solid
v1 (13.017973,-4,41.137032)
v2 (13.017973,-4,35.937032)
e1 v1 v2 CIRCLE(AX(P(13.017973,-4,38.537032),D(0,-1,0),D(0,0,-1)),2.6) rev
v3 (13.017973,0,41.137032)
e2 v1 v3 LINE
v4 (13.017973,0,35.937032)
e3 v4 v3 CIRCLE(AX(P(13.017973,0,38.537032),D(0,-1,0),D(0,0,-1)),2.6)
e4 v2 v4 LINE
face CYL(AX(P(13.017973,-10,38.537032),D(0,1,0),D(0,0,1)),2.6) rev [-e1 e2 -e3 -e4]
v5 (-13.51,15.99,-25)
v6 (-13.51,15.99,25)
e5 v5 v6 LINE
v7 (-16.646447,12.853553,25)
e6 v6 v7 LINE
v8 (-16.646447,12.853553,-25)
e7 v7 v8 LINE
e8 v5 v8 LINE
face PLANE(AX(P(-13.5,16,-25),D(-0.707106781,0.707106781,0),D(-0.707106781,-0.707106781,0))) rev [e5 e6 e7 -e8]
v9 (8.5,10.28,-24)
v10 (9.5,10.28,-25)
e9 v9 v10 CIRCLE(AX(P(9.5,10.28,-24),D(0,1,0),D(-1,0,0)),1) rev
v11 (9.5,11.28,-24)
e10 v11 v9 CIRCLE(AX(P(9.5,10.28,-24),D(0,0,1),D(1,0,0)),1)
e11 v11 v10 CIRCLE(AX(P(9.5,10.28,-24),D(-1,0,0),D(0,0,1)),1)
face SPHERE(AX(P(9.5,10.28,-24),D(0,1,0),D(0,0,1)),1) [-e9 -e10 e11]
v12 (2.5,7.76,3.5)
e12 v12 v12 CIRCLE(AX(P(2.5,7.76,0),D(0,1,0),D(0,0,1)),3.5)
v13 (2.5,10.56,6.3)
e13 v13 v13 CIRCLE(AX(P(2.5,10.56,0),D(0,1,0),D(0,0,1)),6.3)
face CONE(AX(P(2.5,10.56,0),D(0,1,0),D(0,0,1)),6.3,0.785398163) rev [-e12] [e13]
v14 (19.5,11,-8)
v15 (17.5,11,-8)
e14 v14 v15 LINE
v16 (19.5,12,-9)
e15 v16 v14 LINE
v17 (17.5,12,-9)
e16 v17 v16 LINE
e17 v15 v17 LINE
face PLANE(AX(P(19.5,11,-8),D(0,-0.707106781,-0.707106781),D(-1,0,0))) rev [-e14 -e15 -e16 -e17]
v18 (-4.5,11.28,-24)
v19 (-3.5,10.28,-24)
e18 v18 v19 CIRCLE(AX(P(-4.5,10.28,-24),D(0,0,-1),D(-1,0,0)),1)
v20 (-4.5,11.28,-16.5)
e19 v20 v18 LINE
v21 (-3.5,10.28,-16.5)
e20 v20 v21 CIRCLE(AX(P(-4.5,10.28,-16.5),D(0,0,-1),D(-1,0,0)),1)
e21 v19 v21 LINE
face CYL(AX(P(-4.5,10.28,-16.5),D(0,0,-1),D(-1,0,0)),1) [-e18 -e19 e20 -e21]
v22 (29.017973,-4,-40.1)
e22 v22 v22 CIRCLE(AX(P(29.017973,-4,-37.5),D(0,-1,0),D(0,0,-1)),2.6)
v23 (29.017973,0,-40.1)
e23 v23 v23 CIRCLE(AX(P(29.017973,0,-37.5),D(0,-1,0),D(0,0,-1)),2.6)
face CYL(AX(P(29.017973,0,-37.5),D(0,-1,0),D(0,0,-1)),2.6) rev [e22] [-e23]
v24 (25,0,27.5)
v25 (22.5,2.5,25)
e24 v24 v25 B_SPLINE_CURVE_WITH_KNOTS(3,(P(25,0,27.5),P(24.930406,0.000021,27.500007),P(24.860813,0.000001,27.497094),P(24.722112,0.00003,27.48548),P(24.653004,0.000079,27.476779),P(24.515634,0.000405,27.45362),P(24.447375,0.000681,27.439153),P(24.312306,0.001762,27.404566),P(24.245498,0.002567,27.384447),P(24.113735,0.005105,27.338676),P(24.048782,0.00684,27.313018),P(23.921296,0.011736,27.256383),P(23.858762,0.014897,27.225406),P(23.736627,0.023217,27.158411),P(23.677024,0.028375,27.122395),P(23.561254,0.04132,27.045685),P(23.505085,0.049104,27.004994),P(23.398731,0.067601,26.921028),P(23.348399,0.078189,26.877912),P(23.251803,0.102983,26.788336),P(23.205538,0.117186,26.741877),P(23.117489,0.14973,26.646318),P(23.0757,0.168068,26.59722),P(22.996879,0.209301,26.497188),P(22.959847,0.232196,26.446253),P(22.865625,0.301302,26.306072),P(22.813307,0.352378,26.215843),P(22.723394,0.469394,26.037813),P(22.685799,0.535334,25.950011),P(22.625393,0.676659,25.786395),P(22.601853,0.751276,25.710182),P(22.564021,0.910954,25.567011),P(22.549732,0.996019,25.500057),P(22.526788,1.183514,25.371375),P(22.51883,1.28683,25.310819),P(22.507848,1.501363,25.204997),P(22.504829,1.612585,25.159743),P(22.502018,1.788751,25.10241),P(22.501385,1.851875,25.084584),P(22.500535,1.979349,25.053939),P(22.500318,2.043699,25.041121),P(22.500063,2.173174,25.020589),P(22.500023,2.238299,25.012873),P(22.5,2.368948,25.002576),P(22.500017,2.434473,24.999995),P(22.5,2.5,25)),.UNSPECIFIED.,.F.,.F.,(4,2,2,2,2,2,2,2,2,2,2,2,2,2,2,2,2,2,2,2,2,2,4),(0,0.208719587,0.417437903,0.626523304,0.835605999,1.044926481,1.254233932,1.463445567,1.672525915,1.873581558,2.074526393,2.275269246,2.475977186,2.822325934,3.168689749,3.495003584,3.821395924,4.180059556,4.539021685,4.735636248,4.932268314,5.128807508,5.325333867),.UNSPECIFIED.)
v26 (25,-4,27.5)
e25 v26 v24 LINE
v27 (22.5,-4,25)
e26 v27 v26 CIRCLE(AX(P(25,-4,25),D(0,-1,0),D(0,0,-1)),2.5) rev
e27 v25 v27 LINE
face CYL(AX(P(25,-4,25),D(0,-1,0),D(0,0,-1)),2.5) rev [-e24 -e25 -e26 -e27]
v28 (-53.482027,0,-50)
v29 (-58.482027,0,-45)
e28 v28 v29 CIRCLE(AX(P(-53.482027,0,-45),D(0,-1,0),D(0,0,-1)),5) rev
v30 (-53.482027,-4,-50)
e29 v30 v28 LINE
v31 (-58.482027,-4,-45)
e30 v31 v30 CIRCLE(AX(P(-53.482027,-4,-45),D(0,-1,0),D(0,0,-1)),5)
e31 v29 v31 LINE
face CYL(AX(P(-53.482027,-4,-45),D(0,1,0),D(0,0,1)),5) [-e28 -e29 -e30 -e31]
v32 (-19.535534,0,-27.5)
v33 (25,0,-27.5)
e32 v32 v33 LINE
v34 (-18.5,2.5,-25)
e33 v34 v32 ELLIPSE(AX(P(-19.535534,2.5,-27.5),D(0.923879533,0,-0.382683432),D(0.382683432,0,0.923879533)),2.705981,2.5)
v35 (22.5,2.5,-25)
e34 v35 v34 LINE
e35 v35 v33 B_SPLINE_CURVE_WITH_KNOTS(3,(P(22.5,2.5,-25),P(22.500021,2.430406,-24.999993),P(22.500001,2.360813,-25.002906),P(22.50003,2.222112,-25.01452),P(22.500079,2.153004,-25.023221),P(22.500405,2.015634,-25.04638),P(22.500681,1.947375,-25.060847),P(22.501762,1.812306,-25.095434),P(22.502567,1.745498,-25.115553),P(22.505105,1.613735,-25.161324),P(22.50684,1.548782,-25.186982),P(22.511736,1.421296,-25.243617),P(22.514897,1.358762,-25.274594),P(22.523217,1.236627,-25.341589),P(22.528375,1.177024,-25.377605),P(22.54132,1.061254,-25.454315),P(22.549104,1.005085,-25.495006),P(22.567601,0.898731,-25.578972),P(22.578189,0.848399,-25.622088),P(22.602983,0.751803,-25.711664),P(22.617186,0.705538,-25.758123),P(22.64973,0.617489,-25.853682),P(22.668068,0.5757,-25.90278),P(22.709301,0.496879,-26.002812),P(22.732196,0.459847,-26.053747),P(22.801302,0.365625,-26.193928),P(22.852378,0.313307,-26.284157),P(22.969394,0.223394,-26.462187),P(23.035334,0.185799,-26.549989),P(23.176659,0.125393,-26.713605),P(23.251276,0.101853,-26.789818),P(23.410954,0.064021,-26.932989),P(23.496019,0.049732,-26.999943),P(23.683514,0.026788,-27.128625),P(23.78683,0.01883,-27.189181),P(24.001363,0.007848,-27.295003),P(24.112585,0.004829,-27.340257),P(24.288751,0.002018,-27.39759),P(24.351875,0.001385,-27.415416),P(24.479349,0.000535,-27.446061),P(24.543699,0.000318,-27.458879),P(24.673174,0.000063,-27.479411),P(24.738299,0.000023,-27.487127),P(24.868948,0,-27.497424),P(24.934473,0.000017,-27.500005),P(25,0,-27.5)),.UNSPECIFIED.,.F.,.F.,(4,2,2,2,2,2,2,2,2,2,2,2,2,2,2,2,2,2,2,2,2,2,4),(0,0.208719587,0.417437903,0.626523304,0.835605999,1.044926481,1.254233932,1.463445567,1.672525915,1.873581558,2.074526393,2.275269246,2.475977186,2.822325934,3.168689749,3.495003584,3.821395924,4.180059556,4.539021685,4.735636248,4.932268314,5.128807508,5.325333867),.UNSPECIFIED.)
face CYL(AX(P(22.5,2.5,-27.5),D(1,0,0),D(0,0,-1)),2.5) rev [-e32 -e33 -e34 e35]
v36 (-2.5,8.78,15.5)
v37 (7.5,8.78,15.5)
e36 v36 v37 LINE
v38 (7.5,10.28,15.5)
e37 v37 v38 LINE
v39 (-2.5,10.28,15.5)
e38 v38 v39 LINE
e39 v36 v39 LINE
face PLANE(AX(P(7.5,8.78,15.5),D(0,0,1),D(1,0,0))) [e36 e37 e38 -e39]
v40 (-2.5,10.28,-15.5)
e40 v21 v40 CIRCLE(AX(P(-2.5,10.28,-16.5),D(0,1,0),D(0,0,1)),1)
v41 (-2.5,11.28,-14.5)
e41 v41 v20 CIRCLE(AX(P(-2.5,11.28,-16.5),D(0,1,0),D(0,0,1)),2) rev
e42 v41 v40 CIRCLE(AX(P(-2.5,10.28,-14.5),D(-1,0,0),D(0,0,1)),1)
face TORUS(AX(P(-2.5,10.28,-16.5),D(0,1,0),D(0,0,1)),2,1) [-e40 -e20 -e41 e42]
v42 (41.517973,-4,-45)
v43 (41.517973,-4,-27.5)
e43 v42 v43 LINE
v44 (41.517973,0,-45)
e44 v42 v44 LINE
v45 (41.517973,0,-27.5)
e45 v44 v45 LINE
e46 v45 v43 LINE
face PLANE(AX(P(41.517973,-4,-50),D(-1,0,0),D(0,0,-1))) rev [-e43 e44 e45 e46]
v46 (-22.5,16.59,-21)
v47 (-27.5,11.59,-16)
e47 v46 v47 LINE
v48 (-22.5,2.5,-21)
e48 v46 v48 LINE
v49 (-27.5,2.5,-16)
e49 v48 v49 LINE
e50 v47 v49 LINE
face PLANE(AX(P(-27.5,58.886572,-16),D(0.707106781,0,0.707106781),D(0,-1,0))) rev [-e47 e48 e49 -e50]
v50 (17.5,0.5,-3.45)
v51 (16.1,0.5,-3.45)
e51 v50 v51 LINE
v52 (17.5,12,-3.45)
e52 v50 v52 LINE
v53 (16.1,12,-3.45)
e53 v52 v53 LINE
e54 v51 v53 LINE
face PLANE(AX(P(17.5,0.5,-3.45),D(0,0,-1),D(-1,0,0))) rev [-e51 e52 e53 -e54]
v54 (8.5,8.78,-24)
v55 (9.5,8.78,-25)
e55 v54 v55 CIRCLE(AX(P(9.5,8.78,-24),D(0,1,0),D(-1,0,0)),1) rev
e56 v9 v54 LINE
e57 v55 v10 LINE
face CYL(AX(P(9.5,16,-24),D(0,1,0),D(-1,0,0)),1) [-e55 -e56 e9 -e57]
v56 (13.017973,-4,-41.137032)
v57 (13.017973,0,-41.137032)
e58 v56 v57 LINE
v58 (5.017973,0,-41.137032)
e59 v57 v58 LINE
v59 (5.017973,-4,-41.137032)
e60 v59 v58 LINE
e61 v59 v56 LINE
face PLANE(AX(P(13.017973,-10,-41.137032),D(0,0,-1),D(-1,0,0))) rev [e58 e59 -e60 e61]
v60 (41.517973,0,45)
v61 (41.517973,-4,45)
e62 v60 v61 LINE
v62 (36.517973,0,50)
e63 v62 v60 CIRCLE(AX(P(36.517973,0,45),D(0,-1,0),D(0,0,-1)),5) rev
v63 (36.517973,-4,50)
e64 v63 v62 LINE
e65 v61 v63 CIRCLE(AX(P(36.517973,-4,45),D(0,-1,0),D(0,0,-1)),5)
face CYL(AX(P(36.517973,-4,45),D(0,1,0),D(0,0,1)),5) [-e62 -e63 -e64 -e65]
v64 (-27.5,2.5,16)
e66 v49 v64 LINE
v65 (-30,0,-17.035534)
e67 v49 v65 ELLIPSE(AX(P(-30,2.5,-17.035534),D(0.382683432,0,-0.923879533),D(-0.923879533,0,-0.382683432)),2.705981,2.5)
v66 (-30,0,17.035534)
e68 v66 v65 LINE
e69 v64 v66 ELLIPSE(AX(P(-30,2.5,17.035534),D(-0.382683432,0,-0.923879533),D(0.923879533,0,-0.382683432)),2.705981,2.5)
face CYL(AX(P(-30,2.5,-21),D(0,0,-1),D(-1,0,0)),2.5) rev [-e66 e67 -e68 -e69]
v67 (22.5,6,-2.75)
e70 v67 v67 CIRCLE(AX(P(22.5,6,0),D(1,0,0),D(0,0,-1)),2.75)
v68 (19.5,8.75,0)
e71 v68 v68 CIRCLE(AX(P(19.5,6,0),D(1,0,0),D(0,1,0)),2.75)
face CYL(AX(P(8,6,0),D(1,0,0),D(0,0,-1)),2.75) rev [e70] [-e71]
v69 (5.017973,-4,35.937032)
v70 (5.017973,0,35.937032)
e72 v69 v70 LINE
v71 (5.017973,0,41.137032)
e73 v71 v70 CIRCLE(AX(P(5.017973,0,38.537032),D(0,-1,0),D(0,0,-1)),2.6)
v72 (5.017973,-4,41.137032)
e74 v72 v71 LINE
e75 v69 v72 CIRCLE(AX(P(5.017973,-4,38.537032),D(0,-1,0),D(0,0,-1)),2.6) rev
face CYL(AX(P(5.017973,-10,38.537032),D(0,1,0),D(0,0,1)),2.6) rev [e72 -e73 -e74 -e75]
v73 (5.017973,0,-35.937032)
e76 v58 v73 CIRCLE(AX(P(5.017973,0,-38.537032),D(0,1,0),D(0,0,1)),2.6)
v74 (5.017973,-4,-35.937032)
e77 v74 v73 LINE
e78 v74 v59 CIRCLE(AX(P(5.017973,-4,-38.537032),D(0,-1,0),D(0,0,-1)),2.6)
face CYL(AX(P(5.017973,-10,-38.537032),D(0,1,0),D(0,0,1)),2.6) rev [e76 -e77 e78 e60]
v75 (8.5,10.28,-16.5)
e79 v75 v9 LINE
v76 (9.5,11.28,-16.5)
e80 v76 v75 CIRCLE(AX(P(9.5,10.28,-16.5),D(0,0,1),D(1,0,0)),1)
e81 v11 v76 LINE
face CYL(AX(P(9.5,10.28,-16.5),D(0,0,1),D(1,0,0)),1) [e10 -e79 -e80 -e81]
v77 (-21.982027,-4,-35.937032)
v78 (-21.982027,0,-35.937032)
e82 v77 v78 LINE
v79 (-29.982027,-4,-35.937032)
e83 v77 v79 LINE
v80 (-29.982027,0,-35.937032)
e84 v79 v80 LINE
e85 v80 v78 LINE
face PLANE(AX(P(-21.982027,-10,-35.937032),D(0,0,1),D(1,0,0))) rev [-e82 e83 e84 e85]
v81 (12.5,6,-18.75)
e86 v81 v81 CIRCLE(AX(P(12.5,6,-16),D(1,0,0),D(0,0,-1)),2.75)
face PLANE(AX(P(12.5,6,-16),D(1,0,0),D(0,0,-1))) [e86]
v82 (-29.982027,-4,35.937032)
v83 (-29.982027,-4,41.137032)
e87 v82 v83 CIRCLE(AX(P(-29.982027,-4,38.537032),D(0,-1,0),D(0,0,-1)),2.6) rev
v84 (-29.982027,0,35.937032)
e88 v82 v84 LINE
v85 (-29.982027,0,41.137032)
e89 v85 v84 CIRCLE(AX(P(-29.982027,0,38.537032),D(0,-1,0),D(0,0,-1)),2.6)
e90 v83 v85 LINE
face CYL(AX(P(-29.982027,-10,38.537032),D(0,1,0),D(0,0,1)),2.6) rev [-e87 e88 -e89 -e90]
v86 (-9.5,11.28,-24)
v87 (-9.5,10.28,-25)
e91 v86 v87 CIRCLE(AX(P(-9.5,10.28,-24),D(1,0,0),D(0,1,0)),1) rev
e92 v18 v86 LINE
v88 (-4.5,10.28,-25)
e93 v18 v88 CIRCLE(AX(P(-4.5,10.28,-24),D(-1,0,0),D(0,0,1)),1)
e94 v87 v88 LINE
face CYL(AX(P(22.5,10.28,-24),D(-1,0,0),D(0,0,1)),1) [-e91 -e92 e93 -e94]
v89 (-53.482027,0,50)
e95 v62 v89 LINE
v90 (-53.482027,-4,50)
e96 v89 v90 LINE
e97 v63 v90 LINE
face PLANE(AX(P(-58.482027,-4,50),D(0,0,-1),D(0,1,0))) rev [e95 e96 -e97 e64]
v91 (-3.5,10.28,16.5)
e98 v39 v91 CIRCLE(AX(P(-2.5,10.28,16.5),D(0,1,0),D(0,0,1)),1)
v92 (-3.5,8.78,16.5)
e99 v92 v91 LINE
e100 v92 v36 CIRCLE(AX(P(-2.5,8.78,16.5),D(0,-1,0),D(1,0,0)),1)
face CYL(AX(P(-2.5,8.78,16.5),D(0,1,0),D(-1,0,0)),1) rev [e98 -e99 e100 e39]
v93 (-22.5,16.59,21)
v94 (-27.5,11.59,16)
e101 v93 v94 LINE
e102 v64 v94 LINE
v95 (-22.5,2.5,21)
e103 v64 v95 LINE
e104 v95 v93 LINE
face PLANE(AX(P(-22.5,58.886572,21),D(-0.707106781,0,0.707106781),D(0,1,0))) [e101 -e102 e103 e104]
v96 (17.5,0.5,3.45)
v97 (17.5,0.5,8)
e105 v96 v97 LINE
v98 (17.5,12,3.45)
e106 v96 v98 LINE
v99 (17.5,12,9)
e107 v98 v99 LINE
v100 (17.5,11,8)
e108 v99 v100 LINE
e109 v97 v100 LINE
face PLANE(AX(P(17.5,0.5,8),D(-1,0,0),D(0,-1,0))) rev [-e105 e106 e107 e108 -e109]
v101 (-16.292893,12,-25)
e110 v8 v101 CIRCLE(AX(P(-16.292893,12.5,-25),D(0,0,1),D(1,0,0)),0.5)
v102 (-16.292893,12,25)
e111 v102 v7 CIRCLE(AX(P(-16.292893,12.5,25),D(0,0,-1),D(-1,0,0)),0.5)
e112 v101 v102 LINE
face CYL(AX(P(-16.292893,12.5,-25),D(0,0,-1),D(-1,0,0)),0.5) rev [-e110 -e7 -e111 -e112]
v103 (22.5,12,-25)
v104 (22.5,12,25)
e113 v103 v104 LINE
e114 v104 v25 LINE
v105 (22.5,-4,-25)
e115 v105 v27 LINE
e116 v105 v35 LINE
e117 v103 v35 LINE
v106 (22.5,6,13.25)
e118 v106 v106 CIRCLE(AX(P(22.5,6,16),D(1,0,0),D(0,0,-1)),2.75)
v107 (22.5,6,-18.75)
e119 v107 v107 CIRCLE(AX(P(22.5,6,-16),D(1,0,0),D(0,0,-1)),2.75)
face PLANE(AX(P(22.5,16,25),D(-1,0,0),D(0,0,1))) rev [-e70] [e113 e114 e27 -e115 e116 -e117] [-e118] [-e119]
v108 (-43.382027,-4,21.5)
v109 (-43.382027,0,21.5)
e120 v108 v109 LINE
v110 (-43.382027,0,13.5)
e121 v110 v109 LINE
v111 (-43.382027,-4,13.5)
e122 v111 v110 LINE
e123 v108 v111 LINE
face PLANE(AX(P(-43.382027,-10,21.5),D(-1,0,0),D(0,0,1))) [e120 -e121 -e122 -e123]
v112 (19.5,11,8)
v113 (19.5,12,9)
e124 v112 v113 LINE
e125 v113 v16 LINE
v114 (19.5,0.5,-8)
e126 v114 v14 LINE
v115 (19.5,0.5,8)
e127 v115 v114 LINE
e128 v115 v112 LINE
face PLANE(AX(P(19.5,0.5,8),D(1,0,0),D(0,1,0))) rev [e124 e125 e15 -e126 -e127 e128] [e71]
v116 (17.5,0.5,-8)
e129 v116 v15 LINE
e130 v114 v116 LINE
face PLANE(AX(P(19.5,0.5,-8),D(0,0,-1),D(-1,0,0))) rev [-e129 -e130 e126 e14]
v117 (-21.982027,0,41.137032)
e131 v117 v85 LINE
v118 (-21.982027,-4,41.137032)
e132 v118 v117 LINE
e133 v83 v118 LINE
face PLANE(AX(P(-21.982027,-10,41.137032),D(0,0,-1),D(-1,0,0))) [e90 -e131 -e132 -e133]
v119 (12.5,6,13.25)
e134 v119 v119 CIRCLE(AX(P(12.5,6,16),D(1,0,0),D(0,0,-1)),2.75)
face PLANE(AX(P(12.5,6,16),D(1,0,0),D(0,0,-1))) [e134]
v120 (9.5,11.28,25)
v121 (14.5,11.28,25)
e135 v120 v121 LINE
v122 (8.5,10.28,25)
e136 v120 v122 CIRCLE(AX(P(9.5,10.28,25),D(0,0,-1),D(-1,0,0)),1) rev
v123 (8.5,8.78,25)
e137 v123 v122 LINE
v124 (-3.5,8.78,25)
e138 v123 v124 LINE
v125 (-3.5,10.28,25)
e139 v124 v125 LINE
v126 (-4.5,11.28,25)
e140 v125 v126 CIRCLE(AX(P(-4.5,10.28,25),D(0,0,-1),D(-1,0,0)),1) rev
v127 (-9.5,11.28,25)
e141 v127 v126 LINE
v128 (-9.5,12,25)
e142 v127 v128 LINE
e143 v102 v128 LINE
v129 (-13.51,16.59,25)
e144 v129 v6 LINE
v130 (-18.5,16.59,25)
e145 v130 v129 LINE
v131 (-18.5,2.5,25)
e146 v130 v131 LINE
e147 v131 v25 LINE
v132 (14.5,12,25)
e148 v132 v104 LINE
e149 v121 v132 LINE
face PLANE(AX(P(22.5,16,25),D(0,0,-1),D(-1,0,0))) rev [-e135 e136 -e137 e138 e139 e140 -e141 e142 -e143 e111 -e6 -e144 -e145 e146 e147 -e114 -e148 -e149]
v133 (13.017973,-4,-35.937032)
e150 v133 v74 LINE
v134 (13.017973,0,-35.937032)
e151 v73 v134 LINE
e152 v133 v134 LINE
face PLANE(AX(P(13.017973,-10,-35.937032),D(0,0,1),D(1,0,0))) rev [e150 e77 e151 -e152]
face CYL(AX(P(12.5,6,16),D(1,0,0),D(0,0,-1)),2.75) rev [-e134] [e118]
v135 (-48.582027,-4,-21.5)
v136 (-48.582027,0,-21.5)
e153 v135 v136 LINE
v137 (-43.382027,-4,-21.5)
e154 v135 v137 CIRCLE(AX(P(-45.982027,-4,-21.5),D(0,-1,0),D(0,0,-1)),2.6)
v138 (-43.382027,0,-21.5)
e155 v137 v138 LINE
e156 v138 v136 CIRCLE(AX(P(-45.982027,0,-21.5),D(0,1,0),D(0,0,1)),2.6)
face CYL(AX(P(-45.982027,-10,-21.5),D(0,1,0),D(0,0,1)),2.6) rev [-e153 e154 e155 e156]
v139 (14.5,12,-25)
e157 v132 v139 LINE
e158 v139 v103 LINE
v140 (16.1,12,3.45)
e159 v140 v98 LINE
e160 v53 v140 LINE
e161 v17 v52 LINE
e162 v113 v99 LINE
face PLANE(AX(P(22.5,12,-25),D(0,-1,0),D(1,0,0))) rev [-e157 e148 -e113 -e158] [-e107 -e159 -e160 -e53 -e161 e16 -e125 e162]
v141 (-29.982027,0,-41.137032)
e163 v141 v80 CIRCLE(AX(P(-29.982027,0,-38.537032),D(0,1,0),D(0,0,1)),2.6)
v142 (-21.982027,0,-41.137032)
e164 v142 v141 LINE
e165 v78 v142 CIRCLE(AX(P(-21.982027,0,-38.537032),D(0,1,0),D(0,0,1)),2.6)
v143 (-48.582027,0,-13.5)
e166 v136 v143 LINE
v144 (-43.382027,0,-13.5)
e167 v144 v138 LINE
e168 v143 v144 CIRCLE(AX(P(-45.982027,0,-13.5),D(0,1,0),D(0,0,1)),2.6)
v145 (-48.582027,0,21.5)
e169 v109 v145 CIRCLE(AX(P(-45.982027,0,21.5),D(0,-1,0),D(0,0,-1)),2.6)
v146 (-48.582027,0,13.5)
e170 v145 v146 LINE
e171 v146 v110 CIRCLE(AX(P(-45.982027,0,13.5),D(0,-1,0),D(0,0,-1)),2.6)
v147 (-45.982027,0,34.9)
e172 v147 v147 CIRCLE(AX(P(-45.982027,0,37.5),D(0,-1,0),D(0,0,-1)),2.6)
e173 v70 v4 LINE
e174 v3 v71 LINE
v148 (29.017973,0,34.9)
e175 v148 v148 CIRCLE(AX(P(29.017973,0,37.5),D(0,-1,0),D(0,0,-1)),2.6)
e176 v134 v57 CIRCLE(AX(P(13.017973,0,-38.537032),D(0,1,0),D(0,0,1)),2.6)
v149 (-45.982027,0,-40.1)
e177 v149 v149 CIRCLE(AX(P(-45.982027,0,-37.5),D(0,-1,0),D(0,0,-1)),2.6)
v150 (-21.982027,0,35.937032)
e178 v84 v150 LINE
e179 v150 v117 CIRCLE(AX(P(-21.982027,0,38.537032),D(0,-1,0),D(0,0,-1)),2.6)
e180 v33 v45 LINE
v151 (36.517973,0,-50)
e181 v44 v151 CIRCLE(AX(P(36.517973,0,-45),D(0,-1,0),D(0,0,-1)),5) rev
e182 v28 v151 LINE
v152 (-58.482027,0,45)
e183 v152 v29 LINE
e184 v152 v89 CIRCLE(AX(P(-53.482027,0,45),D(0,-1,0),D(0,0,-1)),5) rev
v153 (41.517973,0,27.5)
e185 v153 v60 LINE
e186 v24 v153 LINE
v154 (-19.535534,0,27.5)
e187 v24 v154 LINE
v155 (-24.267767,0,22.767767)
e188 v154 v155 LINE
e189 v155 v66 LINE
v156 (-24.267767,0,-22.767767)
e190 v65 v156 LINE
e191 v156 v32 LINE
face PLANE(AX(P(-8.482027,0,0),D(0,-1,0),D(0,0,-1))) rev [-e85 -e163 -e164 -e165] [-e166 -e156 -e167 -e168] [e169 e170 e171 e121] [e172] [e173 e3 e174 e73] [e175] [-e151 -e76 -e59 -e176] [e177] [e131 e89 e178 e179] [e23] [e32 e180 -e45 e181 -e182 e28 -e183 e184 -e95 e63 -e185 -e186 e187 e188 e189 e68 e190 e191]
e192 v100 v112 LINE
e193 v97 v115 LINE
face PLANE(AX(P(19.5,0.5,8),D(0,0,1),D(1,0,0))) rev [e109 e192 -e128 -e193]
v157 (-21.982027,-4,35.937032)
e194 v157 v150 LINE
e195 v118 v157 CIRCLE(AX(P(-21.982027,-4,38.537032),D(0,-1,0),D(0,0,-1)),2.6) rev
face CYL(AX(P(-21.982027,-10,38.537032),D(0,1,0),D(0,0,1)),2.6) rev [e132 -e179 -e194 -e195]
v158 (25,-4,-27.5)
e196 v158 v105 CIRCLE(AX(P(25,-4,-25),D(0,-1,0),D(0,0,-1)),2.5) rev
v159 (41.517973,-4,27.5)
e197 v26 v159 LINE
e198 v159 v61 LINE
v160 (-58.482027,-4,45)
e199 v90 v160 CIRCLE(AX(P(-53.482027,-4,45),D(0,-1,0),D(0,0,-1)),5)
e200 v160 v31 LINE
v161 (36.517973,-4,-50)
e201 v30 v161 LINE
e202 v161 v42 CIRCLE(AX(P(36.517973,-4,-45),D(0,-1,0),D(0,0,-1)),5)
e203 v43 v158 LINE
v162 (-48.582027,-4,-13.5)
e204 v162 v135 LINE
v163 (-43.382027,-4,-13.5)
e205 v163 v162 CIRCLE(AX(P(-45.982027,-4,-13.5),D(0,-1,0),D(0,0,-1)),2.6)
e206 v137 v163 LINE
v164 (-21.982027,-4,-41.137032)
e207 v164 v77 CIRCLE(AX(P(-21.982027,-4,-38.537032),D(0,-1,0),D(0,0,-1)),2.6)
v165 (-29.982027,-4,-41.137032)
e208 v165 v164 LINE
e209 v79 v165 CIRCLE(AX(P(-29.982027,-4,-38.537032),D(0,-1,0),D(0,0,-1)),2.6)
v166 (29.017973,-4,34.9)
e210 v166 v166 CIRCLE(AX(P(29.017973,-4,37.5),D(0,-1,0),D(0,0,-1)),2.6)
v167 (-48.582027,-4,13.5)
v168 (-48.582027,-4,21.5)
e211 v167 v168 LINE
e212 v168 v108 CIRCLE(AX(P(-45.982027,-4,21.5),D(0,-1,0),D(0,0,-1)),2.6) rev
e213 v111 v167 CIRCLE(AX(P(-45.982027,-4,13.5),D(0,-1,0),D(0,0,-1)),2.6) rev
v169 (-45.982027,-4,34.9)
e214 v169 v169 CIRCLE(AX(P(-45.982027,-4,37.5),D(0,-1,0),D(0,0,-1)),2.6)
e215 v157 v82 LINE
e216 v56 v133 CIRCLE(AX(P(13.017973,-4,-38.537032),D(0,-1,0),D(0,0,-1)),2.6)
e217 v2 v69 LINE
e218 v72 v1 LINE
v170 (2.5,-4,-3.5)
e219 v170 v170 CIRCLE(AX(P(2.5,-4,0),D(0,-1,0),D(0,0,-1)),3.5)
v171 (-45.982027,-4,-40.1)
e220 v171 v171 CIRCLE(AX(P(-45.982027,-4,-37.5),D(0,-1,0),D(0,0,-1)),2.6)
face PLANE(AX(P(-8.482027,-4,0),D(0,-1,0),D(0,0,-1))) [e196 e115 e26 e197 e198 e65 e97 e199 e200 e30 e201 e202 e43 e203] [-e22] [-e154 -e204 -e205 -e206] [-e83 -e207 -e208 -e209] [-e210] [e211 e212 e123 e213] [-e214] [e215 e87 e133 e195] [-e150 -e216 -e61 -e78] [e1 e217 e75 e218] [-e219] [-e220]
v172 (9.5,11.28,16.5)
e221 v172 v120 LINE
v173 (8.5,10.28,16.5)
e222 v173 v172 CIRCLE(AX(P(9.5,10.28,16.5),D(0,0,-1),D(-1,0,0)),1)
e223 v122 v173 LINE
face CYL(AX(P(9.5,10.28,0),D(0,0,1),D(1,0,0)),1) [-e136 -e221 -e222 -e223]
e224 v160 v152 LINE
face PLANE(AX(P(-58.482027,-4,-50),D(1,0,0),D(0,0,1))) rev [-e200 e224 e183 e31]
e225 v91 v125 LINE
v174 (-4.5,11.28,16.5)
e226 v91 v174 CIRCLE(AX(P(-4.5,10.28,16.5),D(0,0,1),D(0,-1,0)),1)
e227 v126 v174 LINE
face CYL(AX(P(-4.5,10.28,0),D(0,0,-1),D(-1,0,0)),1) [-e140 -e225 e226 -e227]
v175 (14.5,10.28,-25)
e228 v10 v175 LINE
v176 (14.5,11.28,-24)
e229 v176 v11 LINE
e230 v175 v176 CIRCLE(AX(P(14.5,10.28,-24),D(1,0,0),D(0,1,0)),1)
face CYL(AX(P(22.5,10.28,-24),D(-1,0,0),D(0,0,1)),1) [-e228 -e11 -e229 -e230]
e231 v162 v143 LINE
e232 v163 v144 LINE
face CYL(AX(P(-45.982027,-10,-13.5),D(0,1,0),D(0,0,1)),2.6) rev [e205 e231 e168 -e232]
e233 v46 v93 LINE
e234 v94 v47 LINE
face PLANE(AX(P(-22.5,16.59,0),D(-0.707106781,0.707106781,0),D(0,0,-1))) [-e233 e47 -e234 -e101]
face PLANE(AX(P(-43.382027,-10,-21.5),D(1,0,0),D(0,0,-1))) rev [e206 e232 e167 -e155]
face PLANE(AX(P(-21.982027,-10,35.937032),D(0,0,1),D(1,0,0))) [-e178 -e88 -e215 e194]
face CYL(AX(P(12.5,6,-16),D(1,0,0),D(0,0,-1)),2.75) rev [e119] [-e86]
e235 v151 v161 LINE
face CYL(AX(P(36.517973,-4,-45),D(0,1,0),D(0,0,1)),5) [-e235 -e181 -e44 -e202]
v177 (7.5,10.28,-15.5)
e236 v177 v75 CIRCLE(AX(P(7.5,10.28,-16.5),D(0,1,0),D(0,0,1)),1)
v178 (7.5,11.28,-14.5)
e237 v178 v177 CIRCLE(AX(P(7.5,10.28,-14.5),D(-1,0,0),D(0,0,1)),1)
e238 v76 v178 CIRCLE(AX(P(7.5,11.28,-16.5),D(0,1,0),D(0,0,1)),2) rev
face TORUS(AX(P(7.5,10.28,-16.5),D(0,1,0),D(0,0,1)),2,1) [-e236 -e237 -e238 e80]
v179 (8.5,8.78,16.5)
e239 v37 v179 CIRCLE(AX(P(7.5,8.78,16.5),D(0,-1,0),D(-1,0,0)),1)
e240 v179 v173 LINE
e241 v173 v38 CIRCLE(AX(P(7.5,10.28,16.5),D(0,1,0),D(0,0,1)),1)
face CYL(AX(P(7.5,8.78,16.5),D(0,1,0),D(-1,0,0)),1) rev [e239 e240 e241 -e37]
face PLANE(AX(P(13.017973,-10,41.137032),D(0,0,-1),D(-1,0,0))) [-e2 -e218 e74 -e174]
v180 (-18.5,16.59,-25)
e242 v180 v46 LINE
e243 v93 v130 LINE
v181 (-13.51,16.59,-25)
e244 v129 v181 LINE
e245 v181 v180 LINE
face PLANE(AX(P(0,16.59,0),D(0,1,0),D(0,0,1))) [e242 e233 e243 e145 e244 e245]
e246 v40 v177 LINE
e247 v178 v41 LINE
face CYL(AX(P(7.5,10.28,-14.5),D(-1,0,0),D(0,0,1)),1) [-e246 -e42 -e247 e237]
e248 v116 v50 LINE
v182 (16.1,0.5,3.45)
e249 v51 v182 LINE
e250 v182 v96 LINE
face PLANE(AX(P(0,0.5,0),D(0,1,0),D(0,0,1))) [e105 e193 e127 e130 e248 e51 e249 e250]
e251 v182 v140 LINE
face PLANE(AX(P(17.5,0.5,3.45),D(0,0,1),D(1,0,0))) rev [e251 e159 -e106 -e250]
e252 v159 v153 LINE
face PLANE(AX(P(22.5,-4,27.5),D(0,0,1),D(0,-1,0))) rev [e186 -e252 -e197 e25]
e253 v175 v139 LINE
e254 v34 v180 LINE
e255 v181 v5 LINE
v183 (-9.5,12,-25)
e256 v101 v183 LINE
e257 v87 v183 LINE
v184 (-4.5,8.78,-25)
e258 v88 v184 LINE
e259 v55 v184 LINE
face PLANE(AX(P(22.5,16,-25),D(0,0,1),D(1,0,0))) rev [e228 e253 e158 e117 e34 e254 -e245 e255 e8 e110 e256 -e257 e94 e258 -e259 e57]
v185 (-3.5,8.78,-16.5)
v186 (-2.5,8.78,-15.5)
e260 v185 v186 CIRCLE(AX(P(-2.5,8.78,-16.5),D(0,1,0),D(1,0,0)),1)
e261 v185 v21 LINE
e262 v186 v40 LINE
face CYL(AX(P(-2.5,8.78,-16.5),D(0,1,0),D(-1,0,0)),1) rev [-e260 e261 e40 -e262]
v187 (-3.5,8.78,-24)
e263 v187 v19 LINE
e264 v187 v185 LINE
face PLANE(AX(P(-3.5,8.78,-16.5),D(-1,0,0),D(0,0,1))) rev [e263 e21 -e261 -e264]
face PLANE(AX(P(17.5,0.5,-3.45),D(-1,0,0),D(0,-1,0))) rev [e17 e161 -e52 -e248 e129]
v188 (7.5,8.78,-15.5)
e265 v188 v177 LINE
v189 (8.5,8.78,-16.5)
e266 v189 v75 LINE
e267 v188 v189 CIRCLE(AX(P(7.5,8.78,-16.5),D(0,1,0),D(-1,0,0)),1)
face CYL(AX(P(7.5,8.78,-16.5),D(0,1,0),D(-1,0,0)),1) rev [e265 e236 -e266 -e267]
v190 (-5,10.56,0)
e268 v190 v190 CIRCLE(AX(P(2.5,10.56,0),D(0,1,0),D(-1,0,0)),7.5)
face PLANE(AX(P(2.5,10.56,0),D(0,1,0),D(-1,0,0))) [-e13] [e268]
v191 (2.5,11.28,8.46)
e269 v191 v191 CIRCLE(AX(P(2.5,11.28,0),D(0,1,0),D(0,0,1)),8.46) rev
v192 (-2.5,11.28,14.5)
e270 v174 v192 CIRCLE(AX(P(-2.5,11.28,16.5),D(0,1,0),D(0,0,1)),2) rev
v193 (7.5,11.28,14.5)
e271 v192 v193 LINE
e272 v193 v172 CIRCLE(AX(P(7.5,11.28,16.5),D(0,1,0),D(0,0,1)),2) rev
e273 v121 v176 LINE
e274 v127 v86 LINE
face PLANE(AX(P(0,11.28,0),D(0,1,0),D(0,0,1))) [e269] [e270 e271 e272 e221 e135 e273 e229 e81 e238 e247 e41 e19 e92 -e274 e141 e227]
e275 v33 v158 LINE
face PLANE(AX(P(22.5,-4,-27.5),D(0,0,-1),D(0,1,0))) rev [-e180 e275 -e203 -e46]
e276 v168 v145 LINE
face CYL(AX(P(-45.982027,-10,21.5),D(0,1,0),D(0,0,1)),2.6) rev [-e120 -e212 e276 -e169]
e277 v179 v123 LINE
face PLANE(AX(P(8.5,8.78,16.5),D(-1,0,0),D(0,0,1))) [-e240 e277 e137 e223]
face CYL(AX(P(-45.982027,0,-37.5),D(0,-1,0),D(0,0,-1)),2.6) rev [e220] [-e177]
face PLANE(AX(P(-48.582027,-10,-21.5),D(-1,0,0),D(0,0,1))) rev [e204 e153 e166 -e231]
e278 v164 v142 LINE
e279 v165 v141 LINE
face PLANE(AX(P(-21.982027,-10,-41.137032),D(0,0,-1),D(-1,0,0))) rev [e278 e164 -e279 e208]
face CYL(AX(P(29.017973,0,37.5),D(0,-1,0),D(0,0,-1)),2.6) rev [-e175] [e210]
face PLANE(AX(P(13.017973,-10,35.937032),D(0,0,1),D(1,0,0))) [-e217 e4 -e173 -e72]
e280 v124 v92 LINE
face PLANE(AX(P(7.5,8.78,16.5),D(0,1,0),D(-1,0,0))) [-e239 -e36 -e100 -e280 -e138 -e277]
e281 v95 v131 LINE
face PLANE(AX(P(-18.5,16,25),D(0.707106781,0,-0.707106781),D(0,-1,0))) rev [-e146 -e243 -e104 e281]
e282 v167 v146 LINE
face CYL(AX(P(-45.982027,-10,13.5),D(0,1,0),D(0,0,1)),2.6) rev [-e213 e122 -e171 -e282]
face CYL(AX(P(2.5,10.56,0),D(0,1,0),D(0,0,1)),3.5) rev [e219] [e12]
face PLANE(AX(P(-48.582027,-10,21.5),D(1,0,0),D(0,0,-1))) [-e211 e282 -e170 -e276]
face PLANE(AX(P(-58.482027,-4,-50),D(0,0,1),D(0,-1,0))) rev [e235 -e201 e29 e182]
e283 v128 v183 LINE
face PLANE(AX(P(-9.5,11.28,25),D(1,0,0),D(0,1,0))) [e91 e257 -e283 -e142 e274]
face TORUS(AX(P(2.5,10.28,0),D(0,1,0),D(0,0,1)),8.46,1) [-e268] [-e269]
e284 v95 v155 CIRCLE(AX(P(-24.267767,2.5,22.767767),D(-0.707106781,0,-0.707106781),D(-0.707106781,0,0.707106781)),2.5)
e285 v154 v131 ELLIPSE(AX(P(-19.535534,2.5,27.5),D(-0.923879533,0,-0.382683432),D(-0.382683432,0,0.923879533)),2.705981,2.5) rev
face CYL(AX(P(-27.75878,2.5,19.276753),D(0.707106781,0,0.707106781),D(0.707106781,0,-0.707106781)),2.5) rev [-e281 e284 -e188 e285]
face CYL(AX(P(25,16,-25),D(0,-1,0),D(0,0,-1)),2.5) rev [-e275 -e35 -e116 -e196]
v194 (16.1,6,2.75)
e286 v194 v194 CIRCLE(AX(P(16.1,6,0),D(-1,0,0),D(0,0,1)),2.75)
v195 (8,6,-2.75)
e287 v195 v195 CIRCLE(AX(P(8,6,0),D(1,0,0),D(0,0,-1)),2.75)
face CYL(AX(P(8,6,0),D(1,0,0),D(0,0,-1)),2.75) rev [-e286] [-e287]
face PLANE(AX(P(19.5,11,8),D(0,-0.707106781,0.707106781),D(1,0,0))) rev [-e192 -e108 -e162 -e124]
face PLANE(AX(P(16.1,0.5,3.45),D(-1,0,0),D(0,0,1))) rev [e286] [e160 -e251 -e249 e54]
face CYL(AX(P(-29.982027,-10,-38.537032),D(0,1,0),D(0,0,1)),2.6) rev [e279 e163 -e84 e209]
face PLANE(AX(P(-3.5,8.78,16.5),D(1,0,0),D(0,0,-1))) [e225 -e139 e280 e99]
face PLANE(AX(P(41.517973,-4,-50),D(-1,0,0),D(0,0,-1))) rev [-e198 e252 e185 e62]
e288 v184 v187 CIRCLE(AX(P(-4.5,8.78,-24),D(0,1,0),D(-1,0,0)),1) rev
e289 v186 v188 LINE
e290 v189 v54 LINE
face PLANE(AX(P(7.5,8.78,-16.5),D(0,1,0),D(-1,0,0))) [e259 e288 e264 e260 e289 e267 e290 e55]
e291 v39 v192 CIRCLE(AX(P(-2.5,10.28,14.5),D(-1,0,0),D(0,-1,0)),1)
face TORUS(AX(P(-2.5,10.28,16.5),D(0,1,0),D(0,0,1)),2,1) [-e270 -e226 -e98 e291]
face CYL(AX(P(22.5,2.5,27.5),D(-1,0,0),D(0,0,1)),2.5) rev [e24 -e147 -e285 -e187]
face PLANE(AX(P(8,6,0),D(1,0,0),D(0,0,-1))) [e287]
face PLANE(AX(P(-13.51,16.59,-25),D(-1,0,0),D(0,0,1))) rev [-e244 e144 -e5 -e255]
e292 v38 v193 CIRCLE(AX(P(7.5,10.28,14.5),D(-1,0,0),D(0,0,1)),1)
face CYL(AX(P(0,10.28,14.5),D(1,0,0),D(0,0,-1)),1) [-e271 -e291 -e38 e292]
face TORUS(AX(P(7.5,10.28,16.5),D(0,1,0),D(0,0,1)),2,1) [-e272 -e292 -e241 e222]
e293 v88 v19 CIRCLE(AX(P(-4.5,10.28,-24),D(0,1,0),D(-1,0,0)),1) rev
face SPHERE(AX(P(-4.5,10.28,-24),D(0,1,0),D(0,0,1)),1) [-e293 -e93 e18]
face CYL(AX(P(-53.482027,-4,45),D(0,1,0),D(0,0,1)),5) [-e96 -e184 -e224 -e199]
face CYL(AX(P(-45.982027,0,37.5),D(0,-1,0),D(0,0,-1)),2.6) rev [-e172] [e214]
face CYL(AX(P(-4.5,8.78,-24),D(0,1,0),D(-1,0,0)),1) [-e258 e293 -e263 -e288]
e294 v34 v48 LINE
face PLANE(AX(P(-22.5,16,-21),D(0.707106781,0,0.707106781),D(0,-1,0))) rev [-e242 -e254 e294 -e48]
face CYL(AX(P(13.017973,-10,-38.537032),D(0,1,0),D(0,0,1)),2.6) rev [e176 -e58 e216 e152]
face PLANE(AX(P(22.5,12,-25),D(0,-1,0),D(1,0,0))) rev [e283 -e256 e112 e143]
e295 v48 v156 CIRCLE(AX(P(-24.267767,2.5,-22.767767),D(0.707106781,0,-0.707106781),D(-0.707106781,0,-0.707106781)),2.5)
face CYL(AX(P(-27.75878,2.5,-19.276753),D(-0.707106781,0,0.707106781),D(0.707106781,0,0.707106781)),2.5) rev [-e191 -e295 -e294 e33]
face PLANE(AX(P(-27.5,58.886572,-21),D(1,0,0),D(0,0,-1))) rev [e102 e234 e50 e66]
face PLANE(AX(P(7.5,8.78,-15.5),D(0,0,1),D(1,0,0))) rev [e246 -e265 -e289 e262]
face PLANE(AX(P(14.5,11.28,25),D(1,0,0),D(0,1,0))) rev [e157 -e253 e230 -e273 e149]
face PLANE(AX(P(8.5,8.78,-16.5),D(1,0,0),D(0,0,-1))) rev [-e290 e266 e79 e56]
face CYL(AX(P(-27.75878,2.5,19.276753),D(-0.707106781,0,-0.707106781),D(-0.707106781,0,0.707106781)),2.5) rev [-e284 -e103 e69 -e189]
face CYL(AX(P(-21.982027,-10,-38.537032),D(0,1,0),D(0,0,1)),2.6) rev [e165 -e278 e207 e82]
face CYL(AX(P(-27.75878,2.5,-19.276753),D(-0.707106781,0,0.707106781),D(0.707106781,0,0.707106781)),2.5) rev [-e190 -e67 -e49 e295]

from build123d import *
from build123d.topology import SkipClean

# Parameters (mm, degrees)
SKETCH1_W                                       = 45
SKETCH1_H                                       = 50
BOSS_EXTRUDE1_DEPTH                             = 16
CUT_EXTRUDE1_DEPTH                              = 58.116109812
SKETCH4_W                                       = 24
SKETCH4_H                                       = 50
CUT_EXTRUDE2_DEPTH                              = 0.72
CUT_EXTRUDE3_DEPTH                              = 58.116109812
SKETCH8_R                                       = 7.5
CUT_EXTRUDE4_DEPTH                              = 0.72
CSK_FOR_M6_FLAT_HEAD_MACHINE_SCREW1_D           = 7
CSK_FOR_M6_FLAT_HEAD_MACHINE_SCREW1_CSINK_D     = 12.6
CSK_FOR_M6_FLAT_HEAD_MACHINE_SCREW1_CSINK_ANGLE = 90
CUT_EXTRUDE5_DEPTH                              = 2.5
FILLET1_R                                       = 1
FILLET2_R                                       = 1
FILLET4_R                                       = 0.5
CUT_EXTRUDE7_DEPTH                              = 11.5
SKETCH18_R                                      = 2.75
CUT_EXTRUDE8_DEPTH                              = 14.5
SKETCH19_R                                      = 2.75
CUT_EXTRUDE9_DEPTH                              = 10
SKETCH21_W                                      = 8.99
SKETCH21_H                                      = 50
BOSS_EXTRUDE2_DEPTH                             = 0.6
CHAMFER1_SIZE                                   = 4
CHAMFER2_SIZE                                   = 1
VESA75MOUNT_START                               = -28.858964805
VESA75MOUNT_OUTLINE_R                           = 2.6
VESA75MOUNT_DEPTH                               = 4
BODY_MOVE_COPY2_ANGLE                           = 120
CUT_EXTRUDE12_DEPTH                             = 10
SKETCH25_W                                      = 5
SKETCH25_H                                      = 42
BOSS_EXTRUDE3_DEPTH                             = 16.59
CHAMFER3_SIZE                                   = 5
FILLET7_R                                       = 2.5
FILLET8_R                                       = 2.5
CUT_EXTRUDE13_START                             = -10
SKETCH26_R                                      = 3.5
CUT_EXTRUDE13_DEPTH                             = 10


with BuildPart() as part:
    # Sketch1 → Boss-Extrude1 (new body)
    with BuildSketch(Plane(origin=(0, 0, 0), x_dir=(1, 0, 0), z_dir=(0, 1, 0))):
        Rectangle(SKETCH1_W, SKETCH1_H)
    extrude(amount=BOSS_EXTRUDE1_DEPTH)

    # Sketch3 → Cut-Extrude1 (cut, through all)
    with BuildSketch(Plane.XY.offset(25)):
        Polygon((-13.5, 16), (-17.5, 12), (22.5, 12), (22.5, 16), align=None)
    extrude(amount=-CUT_EXTRUDE1_DEPTH, mode=Mode.SUBTRACT)

    # Sketch4 → Cut-Extrude2 (cut)
    with BuildSketch(Plane(origin=(0, 12, 0), x_dir=(1, 0, 0), z_dir=(0, 1, 0))):
        with Locations((2.5, 0)):
            Rectangle(SKETCH4_W, SKETCH4_H)
    extrude(amount=-CUT_EXTRUDE2_DEPTH, mode=Mode.SUBTRACT)

    # Sketch5 → Cut-Extrude3 (cut, through all)
    with BuildSketch(Plane.XY.offset(25)):
        Polygon((-22.5, 16), (-13.5, 16), (-13.51, 15.99), (-22.5, 15.99), align=None)
    extrude(amount=-CUT_EXTRUDE3_DEPTH, mode=Mode.SUBTRACT)

    # Sketch8 → Cut-Extrude4 (cut)
    with BuildSketch(Plane(origin=(0, 11.28, 0), x_dir=(1, 0, 0), z_dir=(0, 1, 0))):
        with Locations(Location((2.5, 0, 0), (0, 0, 180))):
            Circle(SKETCH8_R)
    extrude(amount=-CUT_EXTRUDE4_DEPTH, mode=Mode.SUBTRACT)

    # CSK for M6 Flat Head Machine Screw1 (through all)
    with Locations(Plane(origin=(0, 10.56, 0), x_dir=(1, 0, 0), z_dir=(0, 1, 0))):
        with Locations((2.5, 0)):
            CounterSinkHole(CSK_FOR_M6_FLAT_HEAD_MACHINE_SCREW1_D / 2, CSK_FOR_M6_FLAT_HEAD_MACHINE_SCREW1_CSINK_D / 2, counter_sink_angle=CSK_FOR_M6_FLAT_HEAD_MACHINE_SCREW1_CSINK_ANGLE)

    # Sketch12 → Cut-Extrude5 (cut)
    with BuildSketch(Plane(origin=(0, 11.28, 0), x_dir=(1, 0, 0), z_dir=(0, 1, 0))):
        with BuildLine():
            Line((7.5, 15.5), (-2.5, 15.5))
            ThreePointArc((-2.5, 15.5), (-3.207106781, 15.792893219), (-3.5, 16.5))
            Line((-3.5, 16.5), (-3.5, 25))
            Line((-3.5, 25), (8.5, 25))
            Line((8.5, 25), (8.5, 16.5))
            ThreePointArc((8.5, 16.5), (8.207106781, 15.792893219), (7.5, 15.5))
        make_face()
    cut_extrude5 = extrude(amount=-CUT_EXTRUDE5_DEPTH, mode=Mode.SUBTRACT)

    # Fillet1
    fillet1_edges = [part.edges().sort_by_distance(p)[0] for p in [
        (-3.5, 10.03, -25),
        (8.5, 10.03, -25),
    ]]
    fillet(fillet1_edges, radius=FILLET1_R)

    # Mirror2: Cut-Extrude5 across plane
    add(cut_extrude5.mirror(Plane.XY), mode=Mode.SUBTRACT)

    # Fillet2
    # the kernel refuses this fillet: 1 mm, written as the material it takes off along each edge
    with BuildSketch(Plane(origin=(7.5, 11.28, 16.5), x_dir=(1, 0, 0), z_dir=(0, 0, 1))) as fillet2_piece_1:
        with BuildLine():
            CenterArc((1 + FILLET2_R, -FILLET2_R), FILLET2_R, 90, 90)
            Line((1, -FILLET2_R), (1 - FILLET2_R * 0.02, -FILLET2_R))
            Line((1 - FILLET2_R * 0.02, -FILLET2_R), (1 - FILLET2_R * 0.02, FILLET2_R * 0.02))
            Line((1 - FILLET2_R * 0.02, FILLET2_R * 0.02), (1 + FILLET2_R, FILLET2_R * 0.02))
            Line((1 + FILLET2_R, FILLET2_R * 0.02), (1 + FILLET2_R, 0))
        make_face()
    revolve(axis=Axis((7.5, 11.28, 16.5), (0, 1, 0)), revolution_arc=90, mode=Mode.SUBTRACT)
    with BuildSketch(Plane(origin=(8.5, 11.28, 27.5), x_dir=(1, 0, 0), z_dir=(0, 0, -1)), Plane(origin=(-3.5, 11.28, 16.5), x_dir=(-1, 0, 0), z_dir=(0, 0, 1))) as fillet2_piece_2:
        with BuildLine():
            CenterArc((FILLET2_R, FILLET2_R), FILLET2_R, 180, 90)
            Line((0, FILLET2_R), (-FILLET2_R * 0.02, FILLET2_R))
            Line((-FILLET2_R * 0.02, FILLET2_R), (-FILLET2_R * 0.02, -FILLET2_R * 0.02))
            Line((-FILLET2_R * 0.02, -FILLET2_R * 0.02), (FILLET2_R, -FILLET2_R * 0.02))
            Line((FILLET2_R, -FILLET2_R * 0.02), (FILLET2_R, 0))
        make_face()
    extrude(amount=11, mode=Mode.SUBTRACT)
    with BuildSketch(Plane(origin=(-2.5, 11.28, 16.5), x_dir=(0, 0, -1), z_dir=(1, 0, 0))) as fillet2_piece_3:
        with BuildLine():
            CenterArc((1 + FILLET2_R, -FILLET2_R), FILLET2_R, 90, 90)
            Line((1, -FILLET2_R), (1 - FILLET2_R * 0.02, -FILLET2_R))
            Line((1 - FILLET2_R * 0.02, -FILLET2_R), (1 - FILLET2_R * 0.02, FILLET2_R * 0.02))
            Line((1 - FILLET2_R * 0.02, FILLET2_R * 0.02), (1 + FILLET2_R, FILLET2_R * 0.02))
            Line((1 + FILLET2_R, FILLET2_R * 0.02), (1 + FILLET2_R, 0))
        make_face()
    revolve(axis=Axis((-2.5, 11.28, 16.5), (0, 1, 0)), revolution_arc=90, mode=Mode.SUBTRACT)
    with BuildSketch(Plane(origin=(7.5, 11.28, 15.5), x_dir=(0, 0, -1), z_dir=(-1, 0, 0))) as fillet2_piece_4:
        with BuildLine():
            CenterArc((FILLET2_R, FILLET2_R), FILLET2_R, 180, 90)
            Line((0, FILLET2_R), (-FILLET2_R * 0.02, FILLET2_R))
            Line((-FILLET2_R * 0.02, FILLET2_R), (-FILLET2_R * 0.02, -FILLET2_R * 0.02))
            Line((-FILLET2_R * 0.02, -FILLET2_R * 0.02), (FILLET2_R, -FILLET2_R * 0.02))
            Line((FILLET2_R, -FILLET2_R * 0.02), (FILLET2_R, 0))
        make_face()
    extrude(amount=10, mode=Mode.SUBTRACT)
    with BuildSketch(Plane(origin=(-4.5, 11.28, -25), x_dir=(0, 0, 1), z_dir=(-1, 0, 0)), Plane(origin=(14.5, 11.28, -25), x_dir=(0, 0, 1), z_dir=(-1, 0, 0))) as fillet2_piece_5:
        with BuildLine():
            CenterArc((FILLET2_R, -FILLET2_R), FILLET2_R, 90, 90)
            Line((0, -FILLET2_R), (-FILLET2_R * 0.02, -FILLET2_R))
            Line((-FILLET2_R * 0.02, -FILLET2_R), (-FILLET2_R * 0.02, FILLET2_R * 0.02))
            Line((-FILLET2_R * 0.02, FILLET2_R * 0.02), (FILLET2_R, FILLET2_R * 0.02))
            Line((FILLET2_R, FILLET2_R * 0.02), (FILLET2_R, 0))
        make_face()
    extrude(amount=5, mode=Mode.SUBTRACT)
    with BuildSketch(Plane(origin=(2.5, 11.28, 0), x_dir=(-1, 0, 0), z_dir=(0, 0, -1))) as fillet2_piece_6:
        with BuildLine():
            CenterArc((8.46, -1), FILLET2_R, 90, 73.739795292)
            Line((7.5, -0.72), (7.4808, -0.7144))
            ThreePointArc((7.4808, -0.7144), (7.48, -0.36), (7.48, 0))
            Line((7.48, 0), (7.5, 0.02))
            Line((7.5, 0.02), (8.46, 0.02))
            Line((8.46, 0.02), (8.46, 0))
        make_face()
    revolve(axis=Axis((2.5, 11.28, 0), (0, 1, 0)), mode=Mode.SUBTRACT)
    with BuildSketch(Plane(origin=(7.5, 11.28, -16.5), x_dir=(1, 0, 0), z_dir=(0, 0, -1))) as fillet2_piece_7:
        with BuildLine():
            CenterArc((1 + FILLET2_R, FILLET2_R), FILLET2_R, 180, 90)
            Line((1, FILLET2_R), (1 - FILLET2_R * 0.02, FILLET2_R))
            Line((1 - FILLET2_R * 0.02, FILLET2_R), (1 - FILLET2_R * 0.02, -FILLET2_R * 0.02))
            Line((1 - FILLET2_R * 0.02, -FILLET2_R * 0.02), (1 + FILLET2_R, -FILLET2_R * 0.02))
            Line((1 + FILLET2_R, -FILLET2_R * 0.02), (1 + FILLET2_R, 0))
        make_face()
    revolve(axis=Axis((7.5, 11.28, -16.5), (0, -1, 0)), revolution_arc=90, mode=Mode.SUBTRACT)
    with BuildSketch(Plane(origin=(8.5, 11.28, -24), x_dir=(1, 0, 0), z_dir=(0, 0, 1)), Plane(origin=(-3.5, 11.28, -16.5), x_dir=(-1, 0, 0), z_dir=(0, 0, -1))) as fillet2_piece_8:
        with BuildLine():
            CenterArc((FILLET2_R, -FILLET2_R), FILLET2_R, 90, 90)
            Line((0, -FILLET2_R), (-FILLET2_R * 0.02, -FILLET2_R))
            Line((-FILLET2_R * 0.02, -FILLET2_R), (-FILLET2_R * 0.02, FILLET2_R * 0.02))
            Line((-FILLET2_R * 0.02, FILLET2_R * 0.02), (FILLET2_R, FILLET2_R * 0.02))
            Line((FILLET2_R, FILLET2_R * 0.02), (FILLET2_R, 0))
        make_face()
    extrude(amount=7.5, mode=Mode.SUBTRACT)
    with BuildSketch(Plane(origin=(-2.5, 11.28, -16.5), x_dir=(0, 0, 1), z_dir=(1, 0, 0))) as fillet2_piece_9:
        with BuildLine():
            CenterArc((1 + FILLET2_R, FILLET2_R), FILLET2_R, 180, 90)
            Line((1, FILLET2_R), (1 - FILLET2_R * 0.02, FILLET2_R))
            Line((1 - FILLET2_R * 0.02, FILLET2_R), (1 - FILLET2_R * 0.02, -FILLET2_R * 0.02))
            Line((1 - FILLET2_R * 0.02, -FILLET2_R * 0.02), (1 + FILLET2_R, -FILLET2_R * 0.02))
            Line((1 + FILLET2_R, -FILLET2_R * 0.02), (1 + FILLET2_R, 0))
        make_face()
    revolve(axis=Axis((-2.5, 11.28, -16.5), (0, -1, 0)), revolution_arc=90, mode=Mode.SUBTRACT)
    with BuildSketch(Plane(origin=(7.5, 11.28, -15.5), x_dir=(0, 0, 1), z_dir=(-1, 0, 0))) as fillet2_piece_10:
        with BuildLine():
            CenterArc((FILLET2_R, -FILLET2_R), FILLET2_R, 90, 90)
            Line((0, -FILLET2_R), (-FILLET2_R * 0.02, -FILLET2_R))
            Line((-FILLET2_R * 0.02, -FILLET2_R), (-FILLET2_R * 0.02, FILLET2_R * 0.02))
            Line((-FILLET2_R * 0.02, FILLET2_R * 0.02), (FILLET2_R, FILLET2_R * 0.02))
            Line((FILLET2_R, FILLET2_R * 0.02), (FILLET2_R, 0))
        make_face()
    extrude(amount=10, mode=Mode.SUBTRACT)
    with BuildSketch(Plane(origin=(-4.5, 11.28, -24), x_dir=(0, 0, -1), z_dir=(-1, 0, 0))) as fillet2_piece_11:
        with BuildLine():
            CenterArc((1 - FILLET2_R, FILLET2_R), FILLET2_R, 270, 90)
            Line((1, FILLET2_R), (1 + FILLET2_R * 0.02, FILLET2_R))
            Line((1 + FILLET2_R * 0.02, FILLET2_R), (1 + FILLET2_R * 0.02, -FILLET2_R * 0.02))
            Line((1 + FILLET2_R * 0.02, -FILLET2_R * 0.02), (1 - FILLET2_R, -FILLET2_R * 0.02))
            Line((1 - FILLET2_R, -FILLET2_R * 0.02), (1 - FILLET2_R, 0))
        make_face()
    revolve(axis=Axis((-4.5, 11.28, -24), (0, -1, 0)), revolution_arc=90, mode=Mode.SUBTRACT)
    with BuildSketch(Plane(origin=(9.5, 11.28, -24), x_dir=(0, 0, -1), z_dir=(1, 0, 0))) as fillet2_piece_12:
        with BuildLine():
            CenterArc((1 - FILLET2_R, -FILLET2_R), FILLET2_R, 0, 90)
            Line((1, -FILLET2_R), (1 + FILLET2_R * 0.02, -FILLET2_R))
            Line((1 + FILLET2_R * 0.02, -FILLET2_R), (1 + FILLET2_R * 0.02, FILLET2_R * 0.02))
            Line((1 + FILLET2_R * 0.02, FILLET2_R * 0.02), (1 - FILLET2_R, FILLET2_R * 0.02))
            Line((1 - FILLET2_R, FILLET2_R * 0.02), (1 - FILLET2_R, 0))
        make_face()
    revolve(axis=Axis((9.5, 11.28, -24), (0, 1, 0)), revolution_arc=90, mode=Mode.SUBTRACT)

    # Fillet4
    fillet4_edges = [part.edges().sort_by_distance(p)[0] for p in [
        (-17.5, 12, 0),
    ]]
    fillet(fillet4_edges, radius=FILLET4_R)

    # Sketch14 → Cut-Extrude7 (cut)
    with BuildSketch(Plane(origin=(0, 12, 0), x_dir=(1, 0, 0), z_dir=(0, 1, 0))):
        Polygon((19.5, -8), (17.5, -8), (17.5, -3.45), (16.1, -3.45), (16.1, 3.45), (17.5, 3.45), (17.5, 8), (19.5, 8), align=None)
    extrude(amount=-CUT_EXTRUDE7_DEPTH, mode=Mode.SUBTRACT)

    # Sketch18 → Cut-Extrude8 (cut)
    with BuildSketch(Plane(origin=(22.5, 0, 0), x_dir=(0, 0, -1), z_dir=(1, 0, 0))):
        with Locations((0, 6)):
            Circle(SKETCH18_R)
    extrude(amount=-CUT_EXTRUDE8_DEPTH, mode=Mode.SUBTRACT)

    # Sketch19 → Cut-Extrude9 (cut)
    with BuildSketch(Plane(origin=(22.5, 0, 0), x_dir=(0, 0, -1), z_dir=(1, 0, 0))):
        with Locations((-16, 6)):
            Circle(SKETCH19_R)
        with Locations((16, 6)):
            Circle(SKETCH19_R)
    extrude(amount=-CUT_EXTRUDE9_DEPTH, mode=Mode.SUBTRACT)

    # Sketch21 → Boss-Extrude2 (add)
    with BuildSketch(Plane(origin=(0, 15.99, 0), x_dir=(1, 0, 0), z_dir=(0, 1, 0))):
        with Locations((-18.005, 0)):
            Rectangle(SKETCH21_W, SKETCH21_H)
    extrude(amount=BOSS_EXTRUDE2_DEPTH)

    # Chamfer1
    chamfer1_edges = [part.edges().sort_by_distance(p)[0] for p in [
        (-22.5, 8.295, 25),
        (-22.5, 8.295, -25),
    ]]
    chamfer(chamfer1_edges, length=CHAMFER1_SIZE)

    # Chamfer2
    chamfer2_edges = [part.edges().sort_by_distance(p)[0] for p in [
        (18.5, 12, 8),
        (18.5, 12, -8),
    ]]
    chamfer(chamfer2_edges, length=CHAMFER2_SIZE)


with BuildPart() as body_2:
    # VESA75mount: read off the stored shape, not the designer's step
    # VESA75mount outline → VESA75mount (new body)
    with BuildSketch(Plane.XY.offset(VESA75MOUNT_START)):
        with BuildLine():
            Line((48.628734023, 116.768459145), (31.128734023, 116.768459145))
            Line((31.128734023, 116.768459145), (31.128734023, 97.750486221))
            Line((31.128734023, 97.750486221), (-23.871265977, 97.750486221))
            Line((-23.871265977, 97.750486221), (-23.871265977, 116.768459145))
            Line((-23.871265977, 116.768459145), (-41.371265977, 116.768459145))
            ThreePointArc((-41.371265977, 116.768459145), (-44.906799883, 115.303993051), (-46.371265977, 111.768459145))
            Line((-46.371265977, 111.768459145), (-46.371265977, 21.768459145))
            ThreePointArc((-46.371265977, 21.768459145), (-44.906799883, 18.232925239), (-41.371265977, 16.768459145))
            Line((-41.371265977, 16.768459145), (48.628734023, 16.768459145))
            ThreePointArc((48.628734023, 16.768459145), (52.164267929, 18.232925239), (53.628734023, 21.768459145))
            Line((53.628734023, 21.768459145), (53.628734023, 111.768459145))
            ThreePointArc((53.628734023, 111.768459145), (52.164267929, 115.303993051), (48.628734023, 116.768459145))
        make_face()
        with Locations((-33.871265977, 29.268459145)):
            Circle(VESA75MOUNT_OUTLINE_R, mode=Mode.SUBTRACT)
        with Locations((41.128734023, 29.268459145)):
            Circle(VESA75MOUNT_OUTLINE_R, mode=Mode.SUBTRACT)
        with Locations((-33.871265977, 104.268459145)):
            Circle(VESA75MOUNT_OUTLINE_R, mode=Mode.SUBTRACT)
        with Locations((41.128734023, 104.268459145)):
            Circle(VESA75MOUNT_OUTLINE_R, mode=Mode.SUBTRACT)
    extrude(amount=VESA75MOUNT_DEPTH)


with BuildPart() as body_2_1:
    # Body-Move/Copy2: read off the stored shape, not the designer's step
    # Body-Move/Copy2: moved
    add(body_2.part.moved(Location((-3.628734, -75.2504862, 28.8589648))).rotate(Axis((0, 0, 0), (0.5773502692, 0.5773502692, -0.5773502692)), BODY_MOVE_COPY2_ANGLE))


with BuildPart() as part_1:
    add(part.part)

    # Combine1: union body 2
    add(body_2_1.part)

    # Sketch24 → Cut-Extrude12 (cut)
    with BuildSketch(Plane(origin=(0, 0, 0), x_dir=(1, 0, 0), z_dir=(0, 1, 0))):
        with BuildLine():
            Line((13.017972924, 35.937032247), (5.017972924, 35.937032247))
            ThreePointArc((5.017972924, 35.937032247), (2.417972924, 38.537032247), (5.017972924, 41.137032247))
            Line((5.017972924, 41.137032247), (13.017972924, 41.137032247))
            ThreePointArc((13.017972924, 41.137032247), (15.617972924, 38.537032247), (13.017972924, 35.937032247))
        make_face()
        with BuildLine():
            Line((-21.982027076, 35.937032247), (-29.982027076, 35.937032247))
            ThreePointArc((-29.982027076, 35.937032247), (-32.582027076, 38.537032247), (-29.982027076, 41.137032247))
            Line((-29.982027076, 41.137032247), (-21.982027076, 41.137032247))
            ThreePointArc((-21.982027076, 41.137032247), (-19.382027076, 38.537032247), (-21.982027076, 35.937032247))
        make_face()
        with BuildLine():
            Line((-43.382027076, 21.5), (-43.382027076, 13.5))
            ThreePointArc((-43.382027076, 13.5), (-45.982027076, 10.9), (-48.582027076, 13.5))
            Line((-48.582027076, 13.5), (-48.582027076, 21.5))
            ThreePointArc((-48.582027076, 21.5), (-45.982027076, 24.1), (-43.382027076, 21.5))
        make_face()
    cut_extrude12 = extrude(amount=-CUT_EXTRUDE12_DEPTH, mode=Mode.SUBTRACT)

    # Mirror3: Cut-Extrude12 across plane
    add(cut_extrude12.mirror(Plane.XY), mode=Mode.SUBTRACT)

    # Sketch25 → Boss-Extrude3 (add)
    with BuildSketch(Plane(origin=(0, 0, 0), x_dir=(1, 0, 0), z_dir=(0, 1, 0))):
        with Locations((-25, 0)):
            Rectangle(SKETCH25_W, SKETCH25_H)
    extrude(amount=BOSS_EXTRUDE3_DEPTH)

    # Chamfer3
    chamfer3_edges = [part_1.edges().sort_by_distance(p)[0] for p in [
        (-27.5, 8.295, 21),
        (-27.5, 8.295, -21),
        (-27.5, 16.59, 0),
    ]]
    chamfer(chamfer3_edges, length=CHAMFER3_SIZE - 0.0001)  # a hair under: the kernel refuses the full size

    # Fillet7
    fillet7_edges = [part_1.edges().sort_by_distance(p)[0] for p in [
        (-22.50005, 0, 21),
        (-25.00005, 5e-09, 18.50005),
        (-20.5, 0, 23),
        (-27.5, 0, 0),
        (2, 0, 25),
        (-25.00005, 5e-09, -18.50005),
        (-22.50005, 0, -21),
        (-20.5, 0, -23),
        (2, 0, -25),
    ]]
    fillet(fillet7_edges, radius=FILLET7_R)

    # Fillet8
    fillet8_edges = [part_1.edges().sort_by_distance(p)[0] for p in [
        (22.500000021, -1.999999995, 27.499999977),
        (22.500000021, -1.999999995, -27.500000023),
    ]]
    fillet(fillet8_edges, radius=FILLET8_R - 0.0001)  # a hair under: the kernel refuses the full size

    # Sketch26 → Cut-Extrude13 (cut)
    with SkipClean():  # the faces are left unmerged after this step: merging them gives an invalid solid
        with BuildSketch(Plane(origin=(0, 0, 0), x_dir=(1, 0, 0), z_dir=(0, 1, 0)).offset(CUT_EXTRUDE13_START)):
            with Locations(Location((2.5, 0, 0), (0, 0, 270))):
                Circle(SKETCH26_R)
        extrude(amount=CUT_EXTRUDE13_DEPTH, mode=Mode.SUBTRACT)


solid = part_1.part
